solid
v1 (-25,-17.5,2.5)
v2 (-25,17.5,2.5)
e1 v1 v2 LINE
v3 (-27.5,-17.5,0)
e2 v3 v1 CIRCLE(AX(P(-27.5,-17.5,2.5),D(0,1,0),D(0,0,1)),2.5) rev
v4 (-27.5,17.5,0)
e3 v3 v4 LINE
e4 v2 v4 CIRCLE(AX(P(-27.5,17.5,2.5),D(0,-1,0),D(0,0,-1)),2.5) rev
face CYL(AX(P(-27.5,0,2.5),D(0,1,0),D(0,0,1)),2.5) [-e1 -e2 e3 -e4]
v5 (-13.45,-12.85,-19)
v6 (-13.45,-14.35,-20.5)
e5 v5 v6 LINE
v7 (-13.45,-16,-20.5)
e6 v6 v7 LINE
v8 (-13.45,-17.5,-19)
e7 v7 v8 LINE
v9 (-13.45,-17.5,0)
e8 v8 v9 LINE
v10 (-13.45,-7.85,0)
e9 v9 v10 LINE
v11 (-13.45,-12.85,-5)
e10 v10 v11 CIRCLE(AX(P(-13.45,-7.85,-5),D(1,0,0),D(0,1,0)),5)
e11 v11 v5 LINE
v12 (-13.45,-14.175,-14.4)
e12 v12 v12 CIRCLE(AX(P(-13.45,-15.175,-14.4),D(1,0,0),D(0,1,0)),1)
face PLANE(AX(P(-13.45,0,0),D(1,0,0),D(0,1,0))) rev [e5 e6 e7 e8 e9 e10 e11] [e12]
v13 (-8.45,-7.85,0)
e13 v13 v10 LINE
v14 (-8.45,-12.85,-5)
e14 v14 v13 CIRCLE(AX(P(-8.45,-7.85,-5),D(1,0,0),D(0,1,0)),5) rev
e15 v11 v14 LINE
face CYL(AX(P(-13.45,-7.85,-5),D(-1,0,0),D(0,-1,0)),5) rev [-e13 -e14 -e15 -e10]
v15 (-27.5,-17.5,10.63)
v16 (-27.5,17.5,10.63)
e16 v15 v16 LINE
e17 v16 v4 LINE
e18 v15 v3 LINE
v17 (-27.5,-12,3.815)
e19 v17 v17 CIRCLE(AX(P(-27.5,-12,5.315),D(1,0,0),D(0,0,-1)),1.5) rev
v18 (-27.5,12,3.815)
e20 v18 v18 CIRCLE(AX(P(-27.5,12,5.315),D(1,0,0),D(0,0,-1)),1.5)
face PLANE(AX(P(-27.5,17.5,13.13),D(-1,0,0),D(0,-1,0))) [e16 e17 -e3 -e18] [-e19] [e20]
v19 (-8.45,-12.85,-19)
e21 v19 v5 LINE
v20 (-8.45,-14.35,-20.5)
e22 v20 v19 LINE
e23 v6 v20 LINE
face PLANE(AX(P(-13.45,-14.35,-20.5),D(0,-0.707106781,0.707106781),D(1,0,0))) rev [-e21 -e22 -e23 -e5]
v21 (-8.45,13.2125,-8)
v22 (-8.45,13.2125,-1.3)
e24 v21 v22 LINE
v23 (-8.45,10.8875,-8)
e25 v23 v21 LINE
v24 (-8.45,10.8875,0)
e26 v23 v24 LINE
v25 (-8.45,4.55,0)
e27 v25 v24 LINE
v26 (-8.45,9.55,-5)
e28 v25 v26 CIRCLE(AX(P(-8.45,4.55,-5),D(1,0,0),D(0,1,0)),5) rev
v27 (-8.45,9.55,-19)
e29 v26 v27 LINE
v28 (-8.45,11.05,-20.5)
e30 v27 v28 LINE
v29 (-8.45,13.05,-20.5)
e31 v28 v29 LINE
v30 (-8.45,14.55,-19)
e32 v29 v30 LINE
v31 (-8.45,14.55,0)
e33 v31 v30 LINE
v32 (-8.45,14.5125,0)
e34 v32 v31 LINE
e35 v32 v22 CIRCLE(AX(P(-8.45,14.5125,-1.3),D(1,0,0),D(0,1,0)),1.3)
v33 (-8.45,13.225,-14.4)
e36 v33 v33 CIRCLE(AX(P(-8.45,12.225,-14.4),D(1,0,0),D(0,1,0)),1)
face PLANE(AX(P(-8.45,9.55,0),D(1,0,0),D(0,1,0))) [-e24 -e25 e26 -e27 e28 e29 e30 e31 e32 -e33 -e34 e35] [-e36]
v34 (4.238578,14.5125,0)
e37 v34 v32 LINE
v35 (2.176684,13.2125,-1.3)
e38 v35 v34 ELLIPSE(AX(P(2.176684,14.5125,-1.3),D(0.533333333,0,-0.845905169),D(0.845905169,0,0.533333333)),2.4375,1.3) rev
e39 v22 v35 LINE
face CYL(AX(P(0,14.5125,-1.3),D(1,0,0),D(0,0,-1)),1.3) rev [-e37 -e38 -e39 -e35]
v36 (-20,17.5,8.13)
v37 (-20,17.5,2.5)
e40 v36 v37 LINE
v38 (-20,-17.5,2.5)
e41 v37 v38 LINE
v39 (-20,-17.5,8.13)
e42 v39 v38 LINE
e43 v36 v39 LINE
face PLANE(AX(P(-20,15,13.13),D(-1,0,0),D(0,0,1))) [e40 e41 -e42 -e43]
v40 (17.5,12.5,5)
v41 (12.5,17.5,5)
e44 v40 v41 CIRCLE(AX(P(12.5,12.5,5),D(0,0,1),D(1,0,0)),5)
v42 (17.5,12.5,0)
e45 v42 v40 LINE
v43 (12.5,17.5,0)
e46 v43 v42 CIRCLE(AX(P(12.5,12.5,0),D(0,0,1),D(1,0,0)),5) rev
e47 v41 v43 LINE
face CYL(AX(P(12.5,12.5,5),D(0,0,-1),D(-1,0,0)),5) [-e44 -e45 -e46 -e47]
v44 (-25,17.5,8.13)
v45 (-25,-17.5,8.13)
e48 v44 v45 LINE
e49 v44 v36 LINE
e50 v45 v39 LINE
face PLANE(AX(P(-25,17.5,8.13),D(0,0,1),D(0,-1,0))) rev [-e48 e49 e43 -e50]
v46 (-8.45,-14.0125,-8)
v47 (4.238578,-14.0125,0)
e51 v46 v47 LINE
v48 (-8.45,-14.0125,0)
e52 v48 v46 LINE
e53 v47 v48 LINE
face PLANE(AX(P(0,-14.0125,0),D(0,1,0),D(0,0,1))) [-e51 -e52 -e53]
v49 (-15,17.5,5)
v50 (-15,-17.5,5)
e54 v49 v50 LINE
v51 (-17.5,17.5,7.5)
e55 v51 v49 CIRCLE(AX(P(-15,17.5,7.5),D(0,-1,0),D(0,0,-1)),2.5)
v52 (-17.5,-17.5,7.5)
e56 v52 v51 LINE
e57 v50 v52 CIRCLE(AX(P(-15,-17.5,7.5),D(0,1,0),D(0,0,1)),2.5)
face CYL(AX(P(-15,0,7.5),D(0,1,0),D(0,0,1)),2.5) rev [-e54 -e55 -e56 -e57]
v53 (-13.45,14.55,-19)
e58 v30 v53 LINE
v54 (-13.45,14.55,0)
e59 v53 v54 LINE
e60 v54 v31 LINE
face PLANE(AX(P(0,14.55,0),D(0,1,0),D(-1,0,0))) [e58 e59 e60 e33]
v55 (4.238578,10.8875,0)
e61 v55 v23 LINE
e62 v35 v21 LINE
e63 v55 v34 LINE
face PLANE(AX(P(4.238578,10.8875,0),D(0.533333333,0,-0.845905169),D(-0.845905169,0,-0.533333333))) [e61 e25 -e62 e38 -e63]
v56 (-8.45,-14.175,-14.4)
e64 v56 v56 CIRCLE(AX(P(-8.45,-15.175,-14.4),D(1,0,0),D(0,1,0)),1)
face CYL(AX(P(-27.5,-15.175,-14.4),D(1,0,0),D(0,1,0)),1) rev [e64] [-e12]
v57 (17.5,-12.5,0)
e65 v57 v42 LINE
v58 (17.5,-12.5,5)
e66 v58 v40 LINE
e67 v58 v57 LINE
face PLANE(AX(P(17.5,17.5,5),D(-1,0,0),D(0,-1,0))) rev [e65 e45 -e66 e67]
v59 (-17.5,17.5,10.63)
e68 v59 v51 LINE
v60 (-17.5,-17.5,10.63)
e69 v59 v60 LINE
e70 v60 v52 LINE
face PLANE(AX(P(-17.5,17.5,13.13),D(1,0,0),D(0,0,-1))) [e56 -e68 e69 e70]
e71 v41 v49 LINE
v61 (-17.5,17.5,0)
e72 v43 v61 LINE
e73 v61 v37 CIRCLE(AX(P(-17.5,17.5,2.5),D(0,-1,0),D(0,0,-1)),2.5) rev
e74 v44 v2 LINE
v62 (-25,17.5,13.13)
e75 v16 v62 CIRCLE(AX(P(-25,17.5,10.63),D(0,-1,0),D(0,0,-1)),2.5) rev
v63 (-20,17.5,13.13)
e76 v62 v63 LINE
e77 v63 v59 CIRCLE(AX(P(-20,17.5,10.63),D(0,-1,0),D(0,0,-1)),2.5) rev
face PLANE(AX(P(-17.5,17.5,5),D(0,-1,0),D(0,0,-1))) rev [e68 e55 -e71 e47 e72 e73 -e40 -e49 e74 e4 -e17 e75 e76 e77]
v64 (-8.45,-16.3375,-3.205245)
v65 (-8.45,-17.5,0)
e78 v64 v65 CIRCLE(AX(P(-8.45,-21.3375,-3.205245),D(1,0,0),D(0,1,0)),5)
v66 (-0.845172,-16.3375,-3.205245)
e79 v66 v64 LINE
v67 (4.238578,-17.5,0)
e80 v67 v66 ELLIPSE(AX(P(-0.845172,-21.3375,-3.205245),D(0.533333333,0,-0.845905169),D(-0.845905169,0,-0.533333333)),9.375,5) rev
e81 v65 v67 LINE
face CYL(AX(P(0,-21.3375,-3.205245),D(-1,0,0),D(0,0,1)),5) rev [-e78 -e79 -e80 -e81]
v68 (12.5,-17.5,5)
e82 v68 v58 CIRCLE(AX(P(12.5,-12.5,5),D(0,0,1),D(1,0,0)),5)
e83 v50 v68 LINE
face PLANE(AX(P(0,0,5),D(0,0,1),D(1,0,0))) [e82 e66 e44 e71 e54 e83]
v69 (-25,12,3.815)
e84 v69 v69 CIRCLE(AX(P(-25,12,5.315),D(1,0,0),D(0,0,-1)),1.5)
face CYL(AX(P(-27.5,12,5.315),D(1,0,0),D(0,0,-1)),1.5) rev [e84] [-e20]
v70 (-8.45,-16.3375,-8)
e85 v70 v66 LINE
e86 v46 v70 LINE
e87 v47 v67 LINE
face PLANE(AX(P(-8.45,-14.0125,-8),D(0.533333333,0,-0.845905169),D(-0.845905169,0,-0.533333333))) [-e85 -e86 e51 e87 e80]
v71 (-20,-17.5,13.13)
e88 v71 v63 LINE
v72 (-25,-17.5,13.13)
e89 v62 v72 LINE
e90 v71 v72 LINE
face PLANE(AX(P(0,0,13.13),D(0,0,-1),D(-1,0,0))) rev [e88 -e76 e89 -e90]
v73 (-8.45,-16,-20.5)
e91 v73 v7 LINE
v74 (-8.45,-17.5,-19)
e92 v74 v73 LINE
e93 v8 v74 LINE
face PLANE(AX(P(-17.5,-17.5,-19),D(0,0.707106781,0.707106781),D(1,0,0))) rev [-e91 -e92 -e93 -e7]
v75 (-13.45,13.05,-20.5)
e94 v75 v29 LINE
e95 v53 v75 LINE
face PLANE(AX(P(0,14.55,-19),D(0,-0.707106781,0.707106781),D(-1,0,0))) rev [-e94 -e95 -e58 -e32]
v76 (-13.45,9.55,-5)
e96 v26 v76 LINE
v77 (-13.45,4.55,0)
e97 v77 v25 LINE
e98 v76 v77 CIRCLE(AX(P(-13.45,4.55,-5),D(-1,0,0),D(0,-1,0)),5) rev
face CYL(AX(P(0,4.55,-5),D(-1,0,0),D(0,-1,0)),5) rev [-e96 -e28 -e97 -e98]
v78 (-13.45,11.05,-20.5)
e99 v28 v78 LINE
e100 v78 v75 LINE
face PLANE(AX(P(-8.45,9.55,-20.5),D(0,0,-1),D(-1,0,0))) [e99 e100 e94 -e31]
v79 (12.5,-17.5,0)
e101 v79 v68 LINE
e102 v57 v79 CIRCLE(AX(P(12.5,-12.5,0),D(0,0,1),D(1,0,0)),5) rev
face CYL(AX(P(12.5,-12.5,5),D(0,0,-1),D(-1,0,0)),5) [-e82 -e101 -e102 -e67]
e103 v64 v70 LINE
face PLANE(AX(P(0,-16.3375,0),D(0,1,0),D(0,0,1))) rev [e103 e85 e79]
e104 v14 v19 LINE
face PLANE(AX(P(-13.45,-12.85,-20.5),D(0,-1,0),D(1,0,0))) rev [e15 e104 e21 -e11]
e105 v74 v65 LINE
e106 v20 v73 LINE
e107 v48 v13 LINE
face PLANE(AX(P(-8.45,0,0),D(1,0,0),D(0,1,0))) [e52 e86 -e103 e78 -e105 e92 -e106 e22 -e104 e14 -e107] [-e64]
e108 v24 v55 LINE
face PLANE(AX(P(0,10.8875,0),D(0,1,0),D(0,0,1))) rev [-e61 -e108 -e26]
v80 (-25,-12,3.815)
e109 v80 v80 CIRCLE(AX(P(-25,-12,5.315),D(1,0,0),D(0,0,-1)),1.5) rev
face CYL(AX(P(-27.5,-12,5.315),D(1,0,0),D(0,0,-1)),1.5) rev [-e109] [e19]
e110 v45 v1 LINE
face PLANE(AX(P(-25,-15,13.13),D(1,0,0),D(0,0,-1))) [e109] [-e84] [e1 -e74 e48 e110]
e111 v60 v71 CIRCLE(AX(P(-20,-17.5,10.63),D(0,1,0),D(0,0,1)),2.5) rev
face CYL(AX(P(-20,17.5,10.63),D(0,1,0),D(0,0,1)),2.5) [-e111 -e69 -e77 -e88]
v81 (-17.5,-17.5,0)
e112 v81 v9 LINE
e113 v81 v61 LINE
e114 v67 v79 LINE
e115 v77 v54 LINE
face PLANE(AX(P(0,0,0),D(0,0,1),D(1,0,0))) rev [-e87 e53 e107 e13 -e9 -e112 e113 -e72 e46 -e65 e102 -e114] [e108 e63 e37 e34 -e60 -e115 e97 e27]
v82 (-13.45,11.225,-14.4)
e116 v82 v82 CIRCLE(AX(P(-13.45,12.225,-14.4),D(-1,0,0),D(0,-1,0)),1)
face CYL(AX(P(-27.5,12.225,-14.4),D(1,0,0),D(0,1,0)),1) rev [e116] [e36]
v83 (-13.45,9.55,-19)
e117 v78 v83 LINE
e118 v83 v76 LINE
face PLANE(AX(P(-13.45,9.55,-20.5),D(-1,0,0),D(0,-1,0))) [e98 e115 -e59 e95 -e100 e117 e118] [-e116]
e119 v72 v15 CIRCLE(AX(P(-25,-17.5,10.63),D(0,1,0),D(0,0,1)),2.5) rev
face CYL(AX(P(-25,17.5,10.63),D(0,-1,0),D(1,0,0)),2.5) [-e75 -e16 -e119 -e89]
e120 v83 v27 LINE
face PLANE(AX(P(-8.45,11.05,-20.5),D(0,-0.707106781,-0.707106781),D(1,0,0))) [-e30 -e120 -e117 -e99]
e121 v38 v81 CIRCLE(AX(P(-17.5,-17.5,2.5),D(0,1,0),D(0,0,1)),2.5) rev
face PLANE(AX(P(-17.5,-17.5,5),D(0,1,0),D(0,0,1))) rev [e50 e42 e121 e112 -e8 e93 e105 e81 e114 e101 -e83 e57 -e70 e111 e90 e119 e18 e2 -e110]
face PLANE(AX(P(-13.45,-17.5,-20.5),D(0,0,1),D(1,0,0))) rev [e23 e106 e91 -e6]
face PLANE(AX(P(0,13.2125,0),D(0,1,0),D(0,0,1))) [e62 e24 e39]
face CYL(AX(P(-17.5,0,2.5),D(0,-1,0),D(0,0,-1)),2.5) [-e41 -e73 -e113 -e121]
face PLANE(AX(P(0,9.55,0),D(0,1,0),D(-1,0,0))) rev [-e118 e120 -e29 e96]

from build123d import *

# Parameters (mm, degrees)
ESQUISSE1_W             = 35
ESQUISSE1_H             = 35
BOSS_EXTRU_1_DEPTH      = 5
BOSS_EXTRU_2_DEPTH      = 13.13
ESQUISSE3_W             = 5
ESQUISSE3_H             = 35
BOSS_EXTRU_3_DEPTH      = 5
BOSS_EXTRU_4_START      = -19.05
ESQUISSE4_W             = 20.5
ESQUISSE4_H             = 4.65
BOSS_EXTRU_4_DEPTH      = 5
BOSS_EXTRU_5_START      = 27.4
ESQUISSE5_W             = 5
ESQUISSE5_H             = 20.5
BOSS_EXTRU_5_DEPTH      = 5
BOSS_EXTRU_6_START      = -1.1625
BOSS_EXTRU_6_DEPTH      = 2.325
BOSS_EXTRU_7_START      = 27.225
BOSS_EXTRU_7_DEPTH      = 2.325
CONG_3_R                = 5
CONG_4_R                = 1.3
CONG_5_R                = 5
ESQUISSE8_R             = 1
ENL_V_MAT_EXTRU_1_DEPTH = 38.415270946
CHANFREIN1_SIZE         = 1.5
CONG_6_R                = 5
CONG_7_R                = 2.5
CONG_8_R                = 2.5
CONG_9_R                = 2.5
ESQUISSE9_R             = 1.5
ENL_V_MAT_EXTRU_2_DEPTH = 51.326434406


# Some blends are built 0.0001 mm under size
with BuildPart() as part:
    # Esquisse1 → Boss.-Extru.1 (new body)
    with BuildSketch(Plane.XY):
        Rectangle(ESQUISSE1_W, ESQUISSE1_H)
    extrude(amount=BOSS_EXTRU_1_DEPTH)

    # Esquisse2 → Boss.-Extru.2 (add)
    with BuildSketch(Plane(origin=(0, 0, 0), x_dir=(-1, 0, 0), z_dir=(0, 0, -1))):
        Polygon((25, 15), (25, -15), (25, -17.5), (27.5, -17.5), (27.5, 17.5), (25, 17.5), align=None)
        Polygon((17.5, 17.5), (17.5, -17.5), (20, -17.5), (20, -15), (20, 15), (20, 17.5), align=None)
    extrude(amount=-BOSS_EXTRU_2_DEPTH)


with BuildPart() as boss_extru_2_piece_1:
    # of the separate pieces the step leaves, piece 1, a body of its own (boss_extru_2_pieces)
    add(part.part.solids().sort_by_distance((17.5, 17.5, 0))[0])



with BuildPart() as boss_extru_2_piece_2:
    # of the separate pieces the step leaves, piece 2, a body of its own (boss_extru_2_pieces)
    add(part.part.solids().sort_by_distance((-25, 17.5, 0))[0])


with BuildPart() as boss_extru_2_piece_1_1:
    add(boss_extru_2_piece_1.part)

    add(boss_extru_2_piece_2.part)  # Boss.-Extru.3 merges Boss.-Extru.2 piece 2
    # Esquisse3 → Boss.-Extru.3 (add)
    with BuildSketch(Plane.ZY.offset(20)):
        with Locations((10.63, 0)):
            Rectangle(ESQUISSE3_W, ESQUISSE3_H)
    extrude(amount=BOSS_EXTRU_3_DEPTH)

    # Esquisse4 → Boss.-Extru.4 (add)
    with BuildSketch(Plane.ZY.offset(27.5).offset(BOSS_EXTRU_4_START)):
        with Locations((-10.25, -15.175)):
            Rectangle(ESQUISSE4_W, ESQUISSE4_H)
    extrude(amount=BOSS_EXTRU_4_DEPTH)

    # Esquisse5 → Boss.-Extru.5 (add)
    with BuildSketch(Plane(origin=(0, -12.85, 0), x_dir=(1, 0, 0), z_dir=(0, 1, 0)).offset(BOSS_EXTRU_5_START)):
        with Locations((-10.95, 10.25)):
            Rectangle(ESQUISSE5_W, ESQUISSE5_H)
    extrude(amount=-BOSS_EXTRU_5_DEPTH)

    # Esquisse6 → Boss.-Extru.6 (add)
    with BuildSketch(Plane.XZ.offset(17.5).offset(BOSS_EXTRU_6_START)):
        Polygon((-8.45, -8), (4.23857754, 0), (-8.45, 0), align=None)
    extrude(amount=-BOSS_EXTRU_6_DEPTH)

    # Esquisse7 → Boss.-Extru.7 (add)
    with BuildSketch(Plane(origin=(0, -14.0125, 0), x_dir=(1, 0, 0), z_dir=(0, 1, 0)).offset(BOSS_EXTRU_7_START)):
        Polygon((-8.45, 8), (-8.45, 0), (4.23857754, 0), align=None)
    extrude(amount=-BOSS_EXTRU_7_DEPTH)

    # Congé3
    # the kernel refuses this fillet: 5 mm, written as the material it adds along each edge
    with BuildSketch(Plane(origin=(12.251689354, -16.3375, 0), x_dir=(0, -1, 0), z_dir=(-1, 0, 0))) as cong_3_piece_1_section:
        with BuildLine():
            CenterArc((5, -3.205244725), CONG_3_R, 140.129918766, 39.870081234)
            Line((0, -3.205244725), (0, 0))
            Line((0, 0), (1.1625, 0))
        make_face()
    cong_3_piece_1 = extrude(amount=20.701689354, mode=Mode.PRIVATE)
    cong_3_piece_1 = split(cong_3_piece_1, bisect_by=Plane(origin=(-0.976512405, -16.627700283, -3.288053324), z_dir=(-0.5333333333333334, 0, 0.8459051693633013)), keep=Keep.TOP, mode=Mode.PRIVATE)
    add(cong_3_piece_1)

    # Congé4
    cong_4_edges = [boss_extru_2_piece_1_1.edges().sort_by_distance(p)[0] for p in [
        (-2.10571123, 13.2125, 0),
    ]]
    fillet(cong_4_edges, radius=CONG_4_R)

    # Congé5
    cong_5_edges = [boss_extru_2_piece_1_1.edges().sort_by_distance(p)[0] for p in [
        (17.5, -17.5, 2.5),
        (17.5, 17.5, 2.5),
    ]]
    fillet(cong_5_edges, radius=CONG_5_R)

    # Esquisse8 → Enlèv. mat.-Extru.1 (cut, through all)
    with BuildSketch(Plane(origin=(-8.45, 0, 0), x_dir=(0, 0, -1), z_dir=(1, 0, 0))):
        with Locations(Location((14.4, 12.225, 0), (0, 0, 90))):
            Circle(ESQUISSE8_R)
        with Locations(Location((14.4, -15.175, 0), (0, 0, 90))):
            Circle(ESQUISSE8_R)
    extrude(amount=-ENL_V_MAT_EXTRU_1_DEPTH, mode=Mode.SUBTRACT)

    # Chanfrein1
    chanfrein1_edges = [boss_extru_2_piece_1_1.edges().sort_by_distance(p)[0] for p in [
        (-10.95, -12.85, -20.5),
        (-10.95, -17.5, -20.5),
        (-10.95, 9.55, -20.5),
        (-10.95, 14.55, -20.5),
    ]]
    chamfer(chanfrein1_edges, length=CHANFREIN1_SIZE)

    # Congé6
    cong_6_edges = [boss_extru_2_piece_1_1.edges().sort_by_distance(p)[0] for p in [
        (-10.95, -12.85, 0),
        (-10.95, 9.55, 0),
    ]]
    fillet(cong_6_edges, radius=CONG_6_R)

    # Congé7
    cong_7_edges = [boss_extru_2_piece_1_1.edges().sort_by_distance(p)[0] for p in [
        (-17.5, 0, 13.13),
        (-27.5, 0, 13.13),
    ]]
    fillet(cong_7_edges, radius=CONG_7_R)

    # Congé8
    cong_8_edges = [boss_extru_2_piece_1_1.edges().sort_by_distance(p)[0] for p in [
        (-17.5, 0, 5),
    ]]
    fillet(cong_8_edges, radius=CONG_8_R)

    # Congé9
    cong_9_edges = [boss_extru_2_piece_1_1.edges().sort_by_distance(p)[0] for p in [
        (-20, 0, 0),
        (-25, 0, 0),
    ]]
    fillet(cong_9_edges, radius=CONG_9_R - 0.0001)  # a hair under: the kernel refuses the full size

    # Esquisse9 → Enlèv. mat.-Extru.2 (cut, through all)
    with BuildSketch(Plane(origin=(-25, 0, 0), x_dir=(0, 0, -1), z_dir=(1, 0, 0))):
        with Locations((-5.315, -12)):
            Circle(ESQUISSE9_R)
        with Locations((-5.315, 12)):
            Circle(ESQUISSE9_R)
    extrude(amount=-ENL_V_MAT_EXTRU_2_DEPTH, mode=Mode.SUBTRACT)


solid = boss_extru_2_piece_1_1.part
